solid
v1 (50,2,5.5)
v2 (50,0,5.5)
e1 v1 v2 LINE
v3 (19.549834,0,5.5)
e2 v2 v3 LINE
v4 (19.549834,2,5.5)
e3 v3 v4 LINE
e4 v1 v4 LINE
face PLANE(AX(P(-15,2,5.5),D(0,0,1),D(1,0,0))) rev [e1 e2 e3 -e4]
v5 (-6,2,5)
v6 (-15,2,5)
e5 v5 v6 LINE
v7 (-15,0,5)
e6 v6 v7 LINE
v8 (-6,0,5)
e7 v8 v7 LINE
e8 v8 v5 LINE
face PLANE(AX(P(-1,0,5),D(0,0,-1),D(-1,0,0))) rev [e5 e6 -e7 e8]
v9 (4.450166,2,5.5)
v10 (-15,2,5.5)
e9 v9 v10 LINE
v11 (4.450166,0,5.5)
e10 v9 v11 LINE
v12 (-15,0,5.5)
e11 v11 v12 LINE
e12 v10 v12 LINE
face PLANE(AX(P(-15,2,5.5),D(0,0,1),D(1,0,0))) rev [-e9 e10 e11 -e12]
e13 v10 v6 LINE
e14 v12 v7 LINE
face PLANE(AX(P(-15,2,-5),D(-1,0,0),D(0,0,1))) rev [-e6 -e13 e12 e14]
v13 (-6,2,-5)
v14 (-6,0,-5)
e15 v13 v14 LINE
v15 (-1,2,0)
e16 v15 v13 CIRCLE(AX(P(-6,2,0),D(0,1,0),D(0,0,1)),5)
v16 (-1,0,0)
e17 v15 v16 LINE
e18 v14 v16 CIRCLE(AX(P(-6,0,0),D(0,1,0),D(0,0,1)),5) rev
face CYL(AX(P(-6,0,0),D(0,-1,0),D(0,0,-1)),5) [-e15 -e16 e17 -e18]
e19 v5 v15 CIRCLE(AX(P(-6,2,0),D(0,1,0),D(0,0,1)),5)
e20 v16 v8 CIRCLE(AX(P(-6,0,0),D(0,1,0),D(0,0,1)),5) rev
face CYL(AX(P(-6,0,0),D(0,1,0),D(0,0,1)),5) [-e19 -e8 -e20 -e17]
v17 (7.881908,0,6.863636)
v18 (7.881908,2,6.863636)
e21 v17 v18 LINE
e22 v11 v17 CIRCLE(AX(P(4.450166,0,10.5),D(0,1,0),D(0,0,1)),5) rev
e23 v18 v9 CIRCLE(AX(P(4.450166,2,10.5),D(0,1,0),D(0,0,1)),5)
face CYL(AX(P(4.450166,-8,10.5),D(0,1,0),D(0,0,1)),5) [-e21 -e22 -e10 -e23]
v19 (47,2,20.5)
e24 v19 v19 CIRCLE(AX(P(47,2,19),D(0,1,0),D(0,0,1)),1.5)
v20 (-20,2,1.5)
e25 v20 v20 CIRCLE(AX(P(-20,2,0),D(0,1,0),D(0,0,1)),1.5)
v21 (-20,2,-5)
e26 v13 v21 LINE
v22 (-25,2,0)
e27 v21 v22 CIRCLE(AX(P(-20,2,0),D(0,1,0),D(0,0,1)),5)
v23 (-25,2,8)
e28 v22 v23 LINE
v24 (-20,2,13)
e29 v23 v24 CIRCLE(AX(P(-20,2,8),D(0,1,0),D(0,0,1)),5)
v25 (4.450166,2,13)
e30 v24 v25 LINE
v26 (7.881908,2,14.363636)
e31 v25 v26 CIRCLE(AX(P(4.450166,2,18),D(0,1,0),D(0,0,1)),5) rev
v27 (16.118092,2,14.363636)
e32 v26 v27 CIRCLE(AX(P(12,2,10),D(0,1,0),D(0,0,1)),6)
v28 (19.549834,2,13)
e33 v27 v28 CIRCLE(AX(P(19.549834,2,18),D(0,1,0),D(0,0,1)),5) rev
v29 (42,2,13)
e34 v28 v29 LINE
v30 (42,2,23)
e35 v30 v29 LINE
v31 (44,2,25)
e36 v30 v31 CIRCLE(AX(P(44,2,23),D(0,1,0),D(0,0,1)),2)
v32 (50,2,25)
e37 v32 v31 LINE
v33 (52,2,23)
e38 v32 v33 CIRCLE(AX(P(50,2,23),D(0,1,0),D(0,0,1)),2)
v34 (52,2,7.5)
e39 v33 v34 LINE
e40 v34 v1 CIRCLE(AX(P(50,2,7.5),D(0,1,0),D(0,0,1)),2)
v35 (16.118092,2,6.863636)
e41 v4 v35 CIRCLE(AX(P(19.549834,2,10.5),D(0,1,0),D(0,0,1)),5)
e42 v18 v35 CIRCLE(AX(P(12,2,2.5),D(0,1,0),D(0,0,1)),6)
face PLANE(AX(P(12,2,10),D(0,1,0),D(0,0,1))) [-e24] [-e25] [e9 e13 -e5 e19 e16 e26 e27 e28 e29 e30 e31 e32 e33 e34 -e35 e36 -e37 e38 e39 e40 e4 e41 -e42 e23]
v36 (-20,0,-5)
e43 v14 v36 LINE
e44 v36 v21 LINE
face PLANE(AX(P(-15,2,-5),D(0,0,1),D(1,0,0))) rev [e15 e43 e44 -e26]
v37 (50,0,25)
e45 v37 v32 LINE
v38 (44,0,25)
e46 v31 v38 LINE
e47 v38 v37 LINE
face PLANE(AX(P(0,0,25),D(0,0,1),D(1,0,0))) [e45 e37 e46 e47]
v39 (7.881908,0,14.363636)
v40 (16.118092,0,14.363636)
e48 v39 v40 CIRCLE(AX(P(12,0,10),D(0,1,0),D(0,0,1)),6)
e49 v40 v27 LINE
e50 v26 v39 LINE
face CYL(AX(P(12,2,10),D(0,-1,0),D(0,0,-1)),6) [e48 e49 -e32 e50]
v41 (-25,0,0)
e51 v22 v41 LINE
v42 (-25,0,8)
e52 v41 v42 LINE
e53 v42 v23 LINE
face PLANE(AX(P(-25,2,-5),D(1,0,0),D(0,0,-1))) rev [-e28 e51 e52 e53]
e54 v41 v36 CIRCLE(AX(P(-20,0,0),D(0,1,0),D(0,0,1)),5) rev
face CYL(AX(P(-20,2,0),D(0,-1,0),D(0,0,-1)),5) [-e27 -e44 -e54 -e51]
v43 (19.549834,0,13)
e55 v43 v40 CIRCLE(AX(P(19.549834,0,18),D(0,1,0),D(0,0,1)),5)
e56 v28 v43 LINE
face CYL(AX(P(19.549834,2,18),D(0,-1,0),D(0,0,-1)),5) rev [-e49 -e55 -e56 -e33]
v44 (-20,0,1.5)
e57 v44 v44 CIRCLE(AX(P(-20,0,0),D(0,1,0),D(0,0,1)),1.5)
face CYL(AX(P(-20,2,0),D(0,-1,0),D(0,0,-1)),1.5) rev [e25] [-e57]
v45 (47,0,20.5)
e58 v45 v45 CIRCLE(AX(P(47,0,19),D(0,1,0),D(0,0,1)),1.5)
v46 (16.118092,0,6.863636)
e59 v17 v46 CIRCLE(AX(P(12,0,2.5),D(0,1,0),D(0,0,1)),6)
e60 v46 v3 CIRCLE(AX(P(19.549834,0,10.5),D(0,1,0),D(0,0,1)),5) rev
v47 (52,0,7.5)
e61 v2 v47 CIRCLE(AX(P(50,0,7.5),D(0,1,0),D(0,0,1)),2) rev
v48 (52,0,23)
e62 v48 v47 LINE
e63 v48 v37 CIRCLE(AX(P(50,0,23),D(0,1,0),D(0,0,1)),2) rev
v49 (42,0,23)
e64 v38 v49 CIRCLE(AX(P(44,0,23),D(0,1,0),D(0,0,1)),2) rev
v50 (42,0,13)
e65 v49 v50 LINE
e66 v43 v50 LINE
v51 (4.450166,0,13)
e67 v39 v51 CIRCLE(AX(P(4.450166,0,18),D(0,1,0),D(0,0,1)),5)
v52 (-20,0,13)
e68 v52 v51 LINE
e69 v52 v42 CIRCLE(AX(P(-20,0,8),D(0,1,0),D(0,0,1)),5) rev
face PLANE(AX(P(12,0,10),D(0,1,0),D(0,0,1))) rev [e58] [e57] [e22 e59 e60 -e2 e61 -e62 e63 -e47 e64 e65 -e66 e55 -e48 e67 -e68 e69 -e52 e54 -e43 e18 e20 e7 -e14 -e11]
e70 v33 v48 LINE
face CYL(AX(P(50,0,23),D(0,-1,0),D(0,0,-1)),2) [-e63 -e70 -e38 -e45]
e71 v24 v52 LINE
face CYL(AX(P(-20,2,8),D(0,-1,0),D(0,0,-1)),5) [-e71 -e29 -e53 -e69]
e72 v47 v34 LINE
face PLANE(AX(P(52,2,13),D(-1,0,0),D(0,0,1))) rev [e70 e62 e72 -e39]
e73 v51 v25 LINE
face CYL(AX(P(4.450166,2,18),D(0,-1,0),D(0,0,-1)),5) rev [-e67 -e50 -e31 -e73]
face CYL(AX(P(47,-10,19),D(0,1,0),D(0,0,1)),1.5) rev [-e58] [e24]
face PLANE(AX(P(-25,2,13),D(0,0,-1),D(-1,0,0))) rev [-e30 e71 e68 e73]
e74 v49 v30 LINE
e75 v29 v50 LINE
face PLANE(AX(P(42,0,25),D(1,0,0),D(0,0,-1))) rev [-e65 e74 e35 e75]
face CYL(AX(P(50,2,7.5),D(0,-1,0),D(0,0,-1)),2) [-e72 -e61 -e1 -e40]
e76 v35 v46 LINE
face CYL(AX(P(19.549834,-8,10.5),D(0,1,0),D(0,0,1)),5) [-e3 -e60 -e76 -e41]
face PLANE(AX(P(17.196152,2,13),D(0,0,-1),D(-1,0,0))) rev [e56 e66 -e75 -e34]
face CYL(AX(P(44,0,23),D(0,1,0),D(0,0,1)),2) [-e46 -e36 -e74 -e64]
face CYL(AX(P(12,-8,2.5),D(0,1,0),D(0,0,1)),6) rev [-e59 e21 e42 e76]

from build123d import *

# Parameters (mm, degrees)
SKETCH_1_R          = 1.5
EXTRUDE_1_DEPTH     = 2
FILLET_2_R          = 5
FILLET_3_R          = 5
SKETCH_7_R          = 6
CUT_EXTRUDE_4_DEPTH = 10
FILLET_5_R          = 5
SKETCH_8_W          = 10
SKETCH_8_H          = 2
EXTRUDE_3_DEPTH     = 12
SKETCH_9_R          = 1.5
CUT_EXTRUDE_5_DEPTH = 12
FILLET_6_R          = 2
SKETCH_10_W         = 10
SKETCH_10_H         = 2
EXTRUDE_4_DEPTH     = 14
FILLET_7_R          = 5
FILLET_8_R          = 5


with BuildPart() as part:
    # 草图1 → 凸台-拉伸1 (new body)
    with BuildSketch(Plane(origin=(0, 0, 0), x_dir=(1, 0, 0), z_dir=(0, 1, 0))):
        with BuildLine():
            Line((17.196152423, -13), (52, -13))
            Line((52, -13), (52, -5.5))
            Line((52, -5.5), (-15, -5.5))
            Line((-15, -5.5), (-15, 5))
            Line((-15, 5), (-25, 5))
            Line((-25, 5), (-25, -13))
            Line((-25, -13), (6.803847577, -13))
            ThreePointArc((6.803847577, -13), (12, -16), (17.196152423, -13))
        make_face()
        with Locations(Location((-20, 0, 0), (0, 0, 270))):
            Circle(SKETCH_1_R, mode=Mode.SUBTRACT)
    extrude(amount=EXTRUDE_1_DEPTH)

    # 圆角2
    fillet_2_edges = [part.edges().sort_by_distance(p)[0] for p in [
        (-25, 1, -5),
    ]]
    fillet(fillet_2_edges, radius=FILLET_2_R)

    # 圆角3
    fillet_3_edges = [part.edges().sort_by_distance(p)[0] for p in [
        (-25, 1, 13),
    ]]
    fillet(fillet_3_edges, radius=FILLET_3_R)

    # 草图7 → 切除-拉伸4 (cut)
    with BuildSketch(Plane(origin=(0, 2, 0), x_dir=(1, 0, 0), z_dir=(0, 1, 0))):
        with Locations((12, -2.5)):
            Circle(SKETCH_7_R)
    extrude(amount=-CUT_EXTRUDE_4_DEPTH, mode=Mode.SUBTRACT)

    # 圆角5
    fillet_5_edges = [part.edges().sort_by_distance(p)[0] for p in [
        (17.196152423, 1, 13),
        (6.803847577, 1, 13),
        (6.803847577, 1, 5.5),
        (17.196152423, 1, 5.5),
    ]]
    fillet(fillet_5_edges, radius=FILLET_5_R)

    # 草图8 → 凸台-拉伸3 (add)
    with BuildSketch(Plane.XY.offset(13)):
        with Locations((47, 1)):
            Rectangle(SKETCH_8_W, SKETCH_8_H)
    extrude(amount=EXTRUDE_3_DEPTH)

    # 草图9 → 切除-拉伸5 (cut)
    with BuildSketch(Plane(origin=(0, 2, 0), x_dir=(1, 0, 0), z_dir=(0, 1, 0))):
        with Locations(Location((47, -19, 0), (0, 0, 270))):
            Circle(SKETCH_9_R)
    extrude(amount=-CUT_EXTRUDE_5_DEPTH, mode=Mode.SUBTRACT)

    # 圆角6
    fillet_6_edges = [part.edges().sort_by_distance(p)[0] for p in [
        (52, 1, 5.5),
        (52, 1, 25),
        (42, 1, 25),
    ]]
    fillet(fillet_6_edges, radius=FILLET_6_R)

    # 草图10 → 凸台-拉伸4 (add)
    with BuildSketch(Plane(origin=(-15, 0, 0), x_dir=(0, 0, -1), z_dir=(1, 0, 0))):
        with Locations((0, 1)):
            Rectangle(SKETCH_10_W, SKETCH_10_H)
    extrude(amount=EXTRUDE_4_DEPTH)

    # 圆角7
    fillet_7_edges = [part.edges().sort_by_distance(p)[0] for p in [
        (-1, 1, 5),
    ]]
    fillet(fillet_7_edges, radius=FILLET_7_R)

    # 圆角8
    fillet_8_edges = [part.edges().sort_by_distance(p)[0] for p in [
        (-1, 1, -5),
    ]]
    fillet(fillet_8_edges, radius=FILLET_8_R - 0.0001)  # a hair under: the kernel refuses the full size


solid = part.part
